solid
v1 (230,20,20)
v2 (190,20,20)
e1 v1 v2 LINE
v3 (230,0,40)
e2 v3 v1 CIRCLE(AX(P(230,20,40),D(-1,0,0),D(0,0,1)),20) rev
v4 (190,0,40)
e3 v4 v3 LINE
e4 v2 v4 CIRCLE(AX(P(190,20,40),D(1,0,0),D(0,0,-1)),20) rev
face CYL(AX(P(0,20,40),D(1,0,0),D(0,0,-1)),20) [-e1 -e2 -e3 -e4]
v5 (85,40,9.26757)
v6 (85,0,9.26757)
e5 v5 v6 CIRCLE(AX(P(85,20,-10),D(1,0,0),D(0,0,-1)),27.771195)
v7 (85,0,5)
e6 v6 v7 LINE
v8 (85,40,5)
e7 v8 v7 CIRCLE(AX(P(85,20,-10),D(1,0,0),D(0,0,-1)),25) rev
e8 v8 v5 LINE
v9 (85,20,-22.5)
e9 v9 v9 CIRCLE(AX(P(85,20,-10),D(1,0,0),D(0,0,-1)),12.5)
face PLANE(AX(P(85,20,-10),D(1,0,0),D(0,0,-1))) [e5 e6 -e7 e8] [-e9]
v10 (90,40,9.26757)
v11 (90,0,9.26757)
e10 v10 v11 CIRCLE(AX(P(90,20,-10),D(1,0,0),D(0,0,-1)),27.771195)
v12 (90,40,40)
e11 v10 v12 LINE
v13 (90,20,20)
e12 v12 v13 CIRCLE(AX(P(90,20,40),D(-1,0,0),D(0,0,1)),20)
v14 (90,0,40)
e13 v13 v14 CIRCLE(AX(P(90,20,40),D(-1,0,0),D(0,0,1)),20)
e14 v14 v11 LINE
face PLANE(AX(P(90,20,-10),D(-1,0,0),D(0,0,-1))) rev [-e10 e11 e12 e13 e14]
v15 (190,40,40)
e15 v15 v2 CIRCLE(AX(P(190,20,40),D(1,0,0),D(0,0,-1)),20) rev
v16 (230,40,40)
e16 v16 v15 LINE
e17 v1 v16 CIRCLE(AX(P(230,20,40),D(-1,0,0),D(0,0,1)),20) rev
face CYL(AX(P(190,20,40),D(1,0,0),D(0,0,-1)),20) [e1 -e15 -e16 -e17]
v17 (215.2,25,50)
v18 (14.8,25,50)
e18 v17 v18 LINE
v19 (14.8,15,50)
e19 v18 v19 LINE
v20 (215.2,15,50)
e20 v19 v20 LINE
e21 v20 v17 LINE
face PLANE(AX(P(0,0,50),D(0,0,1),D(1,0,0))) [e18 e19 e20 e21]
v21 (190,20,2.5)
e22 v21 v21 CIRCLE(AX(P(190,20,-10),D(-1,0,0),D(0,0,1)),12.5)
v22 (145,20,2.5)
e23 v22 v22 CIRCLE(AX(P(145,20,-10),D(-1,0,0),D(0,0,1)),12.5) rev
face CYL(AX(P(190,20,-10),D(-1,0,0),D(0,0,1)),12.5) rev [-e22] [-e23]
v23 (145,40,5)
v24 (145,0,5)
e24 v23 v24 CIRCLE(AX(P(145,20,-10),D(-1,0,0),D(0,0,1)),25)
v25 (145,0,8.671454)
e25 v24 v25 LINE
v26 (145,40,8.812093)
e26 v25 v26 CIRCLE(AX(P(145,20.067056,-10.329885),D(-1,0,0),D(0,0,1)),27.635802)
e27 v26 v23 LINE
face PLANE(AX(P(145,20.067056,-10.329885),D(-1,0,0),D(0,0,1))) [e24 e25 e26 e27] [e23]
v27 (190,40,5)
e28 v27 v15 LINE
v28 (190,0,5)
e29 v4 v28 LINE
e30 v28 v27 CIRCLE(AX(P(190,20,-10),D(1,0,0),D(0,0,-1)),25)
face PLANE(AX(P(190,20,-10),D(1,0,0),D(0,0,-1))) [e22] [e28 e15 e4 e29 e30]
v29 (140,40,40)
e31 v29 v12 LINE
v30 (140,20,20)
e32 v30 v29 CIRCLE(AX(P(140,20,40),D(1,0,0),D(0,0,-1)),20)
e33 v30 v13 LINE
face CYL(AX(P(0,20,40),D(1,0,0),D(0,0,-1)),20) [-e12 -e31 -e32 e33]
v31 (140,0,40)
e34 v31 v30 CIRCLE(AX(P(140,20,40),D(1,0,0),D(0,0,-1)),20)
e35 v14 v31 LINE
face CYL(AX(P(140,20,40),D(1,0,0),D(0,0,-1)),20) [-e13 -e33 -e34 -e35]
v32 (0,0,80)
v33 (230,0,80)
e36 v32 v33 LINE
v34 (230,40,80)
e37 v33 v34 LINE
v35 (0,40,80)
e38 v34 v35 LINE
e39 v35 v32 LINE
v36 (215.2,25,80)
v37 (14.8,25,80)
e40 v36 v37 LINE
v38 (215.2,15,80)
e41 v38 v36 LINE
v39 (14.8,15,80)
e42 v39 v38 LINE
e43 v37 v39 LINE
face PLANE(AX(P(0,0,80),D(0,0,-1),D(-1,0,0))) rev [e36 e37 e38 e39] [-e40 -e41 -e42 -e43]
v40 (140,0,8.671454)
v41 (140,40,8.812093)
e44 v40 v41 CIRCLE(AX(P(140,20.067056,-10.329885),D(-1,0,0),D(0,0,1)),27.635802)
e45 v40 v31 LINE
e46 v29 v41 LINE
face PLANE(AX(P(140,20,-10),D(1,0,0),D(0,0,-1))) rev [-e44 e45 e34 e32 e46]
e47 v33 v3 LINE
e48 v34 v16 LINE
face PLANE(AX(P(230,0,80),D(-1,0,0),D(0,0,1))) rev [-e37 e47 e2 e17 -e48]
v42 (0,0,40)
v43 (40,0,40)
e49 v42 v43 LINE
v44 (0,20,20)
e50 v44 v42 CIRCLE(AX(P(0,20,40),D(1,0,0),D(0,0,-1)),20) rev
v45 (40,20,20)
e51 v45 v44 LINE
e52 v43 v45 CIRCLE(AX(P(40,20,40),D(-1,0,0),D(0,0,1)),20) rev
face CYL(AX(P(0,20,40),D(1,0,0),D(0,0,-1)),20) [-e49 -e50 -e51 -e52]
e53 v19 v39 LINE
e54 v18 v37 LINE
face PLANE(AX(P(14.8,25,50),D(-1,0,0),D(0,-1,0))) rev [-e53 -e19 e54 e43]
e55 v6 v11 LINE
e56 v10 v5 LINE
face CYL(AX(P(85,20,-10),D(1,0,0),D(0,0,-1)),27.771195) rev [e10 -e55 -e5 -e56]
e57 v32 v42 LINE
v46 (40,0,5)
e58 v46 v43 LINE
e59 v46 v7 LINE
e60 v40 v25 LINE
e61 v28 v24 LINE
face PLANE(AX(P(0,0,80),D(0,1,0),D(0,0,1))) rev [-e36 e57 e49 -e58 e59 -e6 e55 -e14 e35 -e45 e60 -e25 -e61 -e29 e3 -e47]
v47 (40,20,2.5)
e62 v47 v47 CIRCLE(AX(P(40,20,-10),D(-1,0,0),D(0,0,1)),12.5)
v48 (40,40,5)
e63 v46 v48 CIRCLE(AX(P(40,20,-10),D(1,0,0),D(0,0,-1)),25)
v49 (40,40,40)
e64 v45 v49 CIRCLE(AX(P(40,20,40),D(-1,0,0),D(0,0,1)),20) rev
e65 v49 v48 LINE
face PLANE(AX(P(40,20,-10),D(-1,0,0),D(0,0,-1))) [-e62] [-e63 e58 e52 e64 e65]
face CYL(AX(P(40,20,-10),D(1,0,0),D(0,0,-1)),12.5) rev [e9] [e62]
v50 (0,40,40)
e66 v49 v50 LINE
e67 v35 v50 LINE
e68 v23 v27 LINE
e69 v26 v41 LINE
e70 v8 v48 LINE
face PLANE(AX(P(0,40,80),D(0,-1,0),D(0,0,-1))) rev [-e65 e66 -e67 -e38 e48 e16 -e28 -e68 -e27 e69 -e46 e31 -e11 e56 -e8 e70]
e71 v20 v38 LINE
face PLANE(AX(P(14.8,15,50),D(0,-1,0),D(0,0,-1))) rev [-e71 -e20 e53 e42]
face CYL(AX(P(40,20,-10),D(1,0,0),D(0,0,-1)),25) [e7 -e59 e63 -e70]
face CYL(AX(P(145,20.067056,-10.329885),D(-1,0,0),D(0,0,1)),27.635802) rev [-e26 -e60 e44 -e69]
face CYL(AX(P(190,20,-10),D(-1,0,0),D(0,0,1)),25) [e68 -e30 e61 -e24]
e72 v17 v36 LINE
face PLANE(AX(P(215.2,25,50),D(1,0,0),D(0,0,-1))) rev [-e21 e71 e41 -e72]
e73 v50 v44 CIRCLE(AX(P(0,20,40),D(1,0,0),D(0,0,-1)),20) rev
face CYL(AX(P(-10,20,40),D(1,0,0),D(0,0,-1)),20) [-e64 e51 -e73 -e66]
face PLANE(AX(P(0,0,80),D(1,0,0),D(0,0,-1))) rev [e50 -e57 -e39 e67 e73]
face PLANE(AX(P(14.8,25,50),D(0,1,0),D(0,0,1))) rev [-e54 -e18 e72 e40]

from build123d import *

# Parameters (mm, degrees)
SKETCH2_W            = 230
SKETCH2_H            = 40
BOSS_EXTRUDE1_DEPTH  = 80
SKETCH3_W            = 200.4
SKETCH3_H            = 10
CUT_EXTRUDE1_DEPTH   = 30
SKETCH6_R            = 25
BOSS_EXTRUDE3_DEPTH  = 50
SKETCH7_R            = 12.5
CUT_EXTRUDE2_DEPTH   = 50
SKETCH8_R            = 26.5
CUT_EXTRUDE3_DEPTH   = 25
CUT_EXTRUDE4_START   = 40
SKETCH11_R           = 26.5
CUT_EXTRUDE4_DEPTH   = 40
SKETCH14_W           = 12.614661349
SKETCH14_H           = 40
CUT_EXTRUDE6_DEPTH   = 50
FILLET3_R            = 20
FILLET3_OF_MIRROR5_R = 20
FILLET3_OF_MIRROR8_R = 20
SKETCH15_R           = 27.771194789
CUT_EXTRUDE7_DEPTH   = 5
SKETCH21_R           = 27.635802496
CUT_EXTRUDE8_DEPTH   = 5


with BuildPart() as part:
    # Sketch2 → Boss-Extrude1 (new body)
    with BuildSketch(Plane.XY):
        with Locations((115, 20)):
            Rectangle(SKETCH2_W, SKETCH2_H)
    extrude(amount=BOSS_EXTRUDE1_DEPTH)

    # Sketch3 → Cut-Extrude1 (cut)
    with BuildSketch(Plane.XY.offset(80)):
        with Locations((115, 20)):
            Rectangle(SKETCH3_W, SKETCH3_H)
    extrude(amount=-CUT_EXTRUDE1_DEPTH, mode=Mode.SUBTRACT)

    # Sketch6 → Boss-Extrude3 (add)
    with BuildSketch(Plane(origin=(140, 0, 0), x_dir=(0, 0, -1), z_dir=(1, 0, 0))):
        with Locations((10, 20)):
            Circle(SKETCH6_R)
    boss_extrude3 = extrude(amount=BOSS_EXTRUDE3_DEPTH)

    # Sketch7 → Cut-Extrude2 (cut)
    with BuildSketch(Plane.ZY.offset(-140)):
        with Locations(Location((-10, 20, 0), (0, 0, 36.869897646))):
            Circle(SKETCH7_R)
    cut_extrude2 = extrude(amount=-CUT_EXTRUDE2_DEPTH, mode=Mode.SUBTRACT)

    # Sketch8 → Cut-Extrude3 (cut)
    with BuildSketch(Plane.ZY.offset(-140)):
        with Locations((-10, 20)):
            Circle(SKETCH8_R)
    cut_extrude3 = extrude(amount=CUT_EXTRUDE3_DEPTH, mode=Mode.SUBTRACT)

    # Sketch11 → Cut-Extrude4 (cut)
    with BuildSketch(Plane(origin=(190, 0, 0), x_dir=(0, 0, -1), z_dir=(1, 0, 0)).offset(CUT_EXTRUDE4_START)):
        with Locations((10, 20)):
            Circle(SKETCH11_R)
    cut_extrude4 = extrude(amount=-CUT_EXTRUDE4_DEPTH, mode=Mode.SUBTRACT)

    # Mirror1: Boss-Extrude3, Cut-Extrude2, Cut-Extrude3, Cut-Extrude4 across plane
    add(boss_extrude3.mirror(Plane(origin=(115, 0, 0), x_dir=(0, 0, 1), z_dir=(1, 0, 0))))
    add(cut_extrude2.mirror(Plane(origin=(115, 0, 0), x_dir=(0, 0, 1), z_dir=(1, 0, 0))), mode=Mode.SUBTRACT)
    add(cut_extrude3.mirror(Plane(origin=(115, 0, 0), x_dir=(0, 0, 1), z_dir=(1, 0, 0))), mode=Mode.SUBTRACT)
    add(cut_extrude4.mirror(Plane(origin=(115, 0, 0), x_dir=(0, 0, 1), z_dir=(1, 0, 0))), mode=Mode.SUBTRACT)

    # Sketch14 → Cut-Extrude6 (cut)
    with BuildSketch(Plane(origin=(90, 0, 0), x_dir=(0, 0, -1), z_dir=(1, 0, 0))):
        with Locations((-13.692669326, 20)):
            Rectangle(SKETCH14_W, SKETCH14_H)
    cut_extrude6 = extrude(amount=CUT_EXTRUDE6_DEPTH, mode=Mode.SUBTRACT)

    # Fillet3
    fillet3_edges = [part.edges().sort_by_distance(p)[0] for p in [
        (115, 40, 20),
        (115, 0, 20),
    ]]
    fillet(fillet3_edges, radius=FILLET3_R - 0.0001)  # a hair under: the kernel refuses the full size

    # Mirror5: Cut-Extrude6 across plane
    add(cut_extrude6.mirror(Plane.ZY.offset(-165)), mode=Mode.SUBTRACT)

    # Fillet3 of Mirror5
    fillet3_of_mirror5_edges = [part.edges().sort_by_distance(p)[0] for p in [
        (210, 40, 20),
        (210, 0, 20),
    ]]
    fillet(fillet3_of_mirror5_edges, radius=FILLET3_OF_MIRROR5_R - 0.0001)  # a hair under: the kernel refuses the full size

    # Mirror8: Cut-Extrude6 across plane
    add(cut_extrude6.mirror(Plane(origin=(65, 0, 0), x_dir=(0, 0, 1), z_dir=(1, 0, 0))), mode=Mode.SUBTRACT)

    # Fillet3 of Mirror8
    fillet3_of_mirror8_edges = [part.edges().sort_by_distance(p)[0] for p in [
        (20, 40, 20),
        (20, 0, 20),
    ]]
    fillet(fillet3_of_mirror8_edges, radius=FILLET3_OF_MIRROR8_R - 0.0001)  # a hair under: the kernel refuses the full size

    # Sketch15 → Cut-Extrude7 (cut)
    with BuildSketch(Plane(origin=(90, 0, 0), x_dir=(0, 0, -1), z_dir=(1, 0, 0))):
        with Locations((10, 20)):
            Circle(SKETCH15_R)
    extrude(amount=-CUT_EXTRUDE7_DEPTH, mode=Mode.SUBTRACT)

    # Sketch21 → Cut-Extrude8 (cut)
    with BuildSketch(Plane.ZY.offset(-140)):
        with Locations((-10.3298846, 20.067055547)):
            Circle(SKETCH21_R)
    extrude(amount=-CUT_EXTRUDE8_DEPTH, mode=Mode.SUBTRACT)


solid = part.part
